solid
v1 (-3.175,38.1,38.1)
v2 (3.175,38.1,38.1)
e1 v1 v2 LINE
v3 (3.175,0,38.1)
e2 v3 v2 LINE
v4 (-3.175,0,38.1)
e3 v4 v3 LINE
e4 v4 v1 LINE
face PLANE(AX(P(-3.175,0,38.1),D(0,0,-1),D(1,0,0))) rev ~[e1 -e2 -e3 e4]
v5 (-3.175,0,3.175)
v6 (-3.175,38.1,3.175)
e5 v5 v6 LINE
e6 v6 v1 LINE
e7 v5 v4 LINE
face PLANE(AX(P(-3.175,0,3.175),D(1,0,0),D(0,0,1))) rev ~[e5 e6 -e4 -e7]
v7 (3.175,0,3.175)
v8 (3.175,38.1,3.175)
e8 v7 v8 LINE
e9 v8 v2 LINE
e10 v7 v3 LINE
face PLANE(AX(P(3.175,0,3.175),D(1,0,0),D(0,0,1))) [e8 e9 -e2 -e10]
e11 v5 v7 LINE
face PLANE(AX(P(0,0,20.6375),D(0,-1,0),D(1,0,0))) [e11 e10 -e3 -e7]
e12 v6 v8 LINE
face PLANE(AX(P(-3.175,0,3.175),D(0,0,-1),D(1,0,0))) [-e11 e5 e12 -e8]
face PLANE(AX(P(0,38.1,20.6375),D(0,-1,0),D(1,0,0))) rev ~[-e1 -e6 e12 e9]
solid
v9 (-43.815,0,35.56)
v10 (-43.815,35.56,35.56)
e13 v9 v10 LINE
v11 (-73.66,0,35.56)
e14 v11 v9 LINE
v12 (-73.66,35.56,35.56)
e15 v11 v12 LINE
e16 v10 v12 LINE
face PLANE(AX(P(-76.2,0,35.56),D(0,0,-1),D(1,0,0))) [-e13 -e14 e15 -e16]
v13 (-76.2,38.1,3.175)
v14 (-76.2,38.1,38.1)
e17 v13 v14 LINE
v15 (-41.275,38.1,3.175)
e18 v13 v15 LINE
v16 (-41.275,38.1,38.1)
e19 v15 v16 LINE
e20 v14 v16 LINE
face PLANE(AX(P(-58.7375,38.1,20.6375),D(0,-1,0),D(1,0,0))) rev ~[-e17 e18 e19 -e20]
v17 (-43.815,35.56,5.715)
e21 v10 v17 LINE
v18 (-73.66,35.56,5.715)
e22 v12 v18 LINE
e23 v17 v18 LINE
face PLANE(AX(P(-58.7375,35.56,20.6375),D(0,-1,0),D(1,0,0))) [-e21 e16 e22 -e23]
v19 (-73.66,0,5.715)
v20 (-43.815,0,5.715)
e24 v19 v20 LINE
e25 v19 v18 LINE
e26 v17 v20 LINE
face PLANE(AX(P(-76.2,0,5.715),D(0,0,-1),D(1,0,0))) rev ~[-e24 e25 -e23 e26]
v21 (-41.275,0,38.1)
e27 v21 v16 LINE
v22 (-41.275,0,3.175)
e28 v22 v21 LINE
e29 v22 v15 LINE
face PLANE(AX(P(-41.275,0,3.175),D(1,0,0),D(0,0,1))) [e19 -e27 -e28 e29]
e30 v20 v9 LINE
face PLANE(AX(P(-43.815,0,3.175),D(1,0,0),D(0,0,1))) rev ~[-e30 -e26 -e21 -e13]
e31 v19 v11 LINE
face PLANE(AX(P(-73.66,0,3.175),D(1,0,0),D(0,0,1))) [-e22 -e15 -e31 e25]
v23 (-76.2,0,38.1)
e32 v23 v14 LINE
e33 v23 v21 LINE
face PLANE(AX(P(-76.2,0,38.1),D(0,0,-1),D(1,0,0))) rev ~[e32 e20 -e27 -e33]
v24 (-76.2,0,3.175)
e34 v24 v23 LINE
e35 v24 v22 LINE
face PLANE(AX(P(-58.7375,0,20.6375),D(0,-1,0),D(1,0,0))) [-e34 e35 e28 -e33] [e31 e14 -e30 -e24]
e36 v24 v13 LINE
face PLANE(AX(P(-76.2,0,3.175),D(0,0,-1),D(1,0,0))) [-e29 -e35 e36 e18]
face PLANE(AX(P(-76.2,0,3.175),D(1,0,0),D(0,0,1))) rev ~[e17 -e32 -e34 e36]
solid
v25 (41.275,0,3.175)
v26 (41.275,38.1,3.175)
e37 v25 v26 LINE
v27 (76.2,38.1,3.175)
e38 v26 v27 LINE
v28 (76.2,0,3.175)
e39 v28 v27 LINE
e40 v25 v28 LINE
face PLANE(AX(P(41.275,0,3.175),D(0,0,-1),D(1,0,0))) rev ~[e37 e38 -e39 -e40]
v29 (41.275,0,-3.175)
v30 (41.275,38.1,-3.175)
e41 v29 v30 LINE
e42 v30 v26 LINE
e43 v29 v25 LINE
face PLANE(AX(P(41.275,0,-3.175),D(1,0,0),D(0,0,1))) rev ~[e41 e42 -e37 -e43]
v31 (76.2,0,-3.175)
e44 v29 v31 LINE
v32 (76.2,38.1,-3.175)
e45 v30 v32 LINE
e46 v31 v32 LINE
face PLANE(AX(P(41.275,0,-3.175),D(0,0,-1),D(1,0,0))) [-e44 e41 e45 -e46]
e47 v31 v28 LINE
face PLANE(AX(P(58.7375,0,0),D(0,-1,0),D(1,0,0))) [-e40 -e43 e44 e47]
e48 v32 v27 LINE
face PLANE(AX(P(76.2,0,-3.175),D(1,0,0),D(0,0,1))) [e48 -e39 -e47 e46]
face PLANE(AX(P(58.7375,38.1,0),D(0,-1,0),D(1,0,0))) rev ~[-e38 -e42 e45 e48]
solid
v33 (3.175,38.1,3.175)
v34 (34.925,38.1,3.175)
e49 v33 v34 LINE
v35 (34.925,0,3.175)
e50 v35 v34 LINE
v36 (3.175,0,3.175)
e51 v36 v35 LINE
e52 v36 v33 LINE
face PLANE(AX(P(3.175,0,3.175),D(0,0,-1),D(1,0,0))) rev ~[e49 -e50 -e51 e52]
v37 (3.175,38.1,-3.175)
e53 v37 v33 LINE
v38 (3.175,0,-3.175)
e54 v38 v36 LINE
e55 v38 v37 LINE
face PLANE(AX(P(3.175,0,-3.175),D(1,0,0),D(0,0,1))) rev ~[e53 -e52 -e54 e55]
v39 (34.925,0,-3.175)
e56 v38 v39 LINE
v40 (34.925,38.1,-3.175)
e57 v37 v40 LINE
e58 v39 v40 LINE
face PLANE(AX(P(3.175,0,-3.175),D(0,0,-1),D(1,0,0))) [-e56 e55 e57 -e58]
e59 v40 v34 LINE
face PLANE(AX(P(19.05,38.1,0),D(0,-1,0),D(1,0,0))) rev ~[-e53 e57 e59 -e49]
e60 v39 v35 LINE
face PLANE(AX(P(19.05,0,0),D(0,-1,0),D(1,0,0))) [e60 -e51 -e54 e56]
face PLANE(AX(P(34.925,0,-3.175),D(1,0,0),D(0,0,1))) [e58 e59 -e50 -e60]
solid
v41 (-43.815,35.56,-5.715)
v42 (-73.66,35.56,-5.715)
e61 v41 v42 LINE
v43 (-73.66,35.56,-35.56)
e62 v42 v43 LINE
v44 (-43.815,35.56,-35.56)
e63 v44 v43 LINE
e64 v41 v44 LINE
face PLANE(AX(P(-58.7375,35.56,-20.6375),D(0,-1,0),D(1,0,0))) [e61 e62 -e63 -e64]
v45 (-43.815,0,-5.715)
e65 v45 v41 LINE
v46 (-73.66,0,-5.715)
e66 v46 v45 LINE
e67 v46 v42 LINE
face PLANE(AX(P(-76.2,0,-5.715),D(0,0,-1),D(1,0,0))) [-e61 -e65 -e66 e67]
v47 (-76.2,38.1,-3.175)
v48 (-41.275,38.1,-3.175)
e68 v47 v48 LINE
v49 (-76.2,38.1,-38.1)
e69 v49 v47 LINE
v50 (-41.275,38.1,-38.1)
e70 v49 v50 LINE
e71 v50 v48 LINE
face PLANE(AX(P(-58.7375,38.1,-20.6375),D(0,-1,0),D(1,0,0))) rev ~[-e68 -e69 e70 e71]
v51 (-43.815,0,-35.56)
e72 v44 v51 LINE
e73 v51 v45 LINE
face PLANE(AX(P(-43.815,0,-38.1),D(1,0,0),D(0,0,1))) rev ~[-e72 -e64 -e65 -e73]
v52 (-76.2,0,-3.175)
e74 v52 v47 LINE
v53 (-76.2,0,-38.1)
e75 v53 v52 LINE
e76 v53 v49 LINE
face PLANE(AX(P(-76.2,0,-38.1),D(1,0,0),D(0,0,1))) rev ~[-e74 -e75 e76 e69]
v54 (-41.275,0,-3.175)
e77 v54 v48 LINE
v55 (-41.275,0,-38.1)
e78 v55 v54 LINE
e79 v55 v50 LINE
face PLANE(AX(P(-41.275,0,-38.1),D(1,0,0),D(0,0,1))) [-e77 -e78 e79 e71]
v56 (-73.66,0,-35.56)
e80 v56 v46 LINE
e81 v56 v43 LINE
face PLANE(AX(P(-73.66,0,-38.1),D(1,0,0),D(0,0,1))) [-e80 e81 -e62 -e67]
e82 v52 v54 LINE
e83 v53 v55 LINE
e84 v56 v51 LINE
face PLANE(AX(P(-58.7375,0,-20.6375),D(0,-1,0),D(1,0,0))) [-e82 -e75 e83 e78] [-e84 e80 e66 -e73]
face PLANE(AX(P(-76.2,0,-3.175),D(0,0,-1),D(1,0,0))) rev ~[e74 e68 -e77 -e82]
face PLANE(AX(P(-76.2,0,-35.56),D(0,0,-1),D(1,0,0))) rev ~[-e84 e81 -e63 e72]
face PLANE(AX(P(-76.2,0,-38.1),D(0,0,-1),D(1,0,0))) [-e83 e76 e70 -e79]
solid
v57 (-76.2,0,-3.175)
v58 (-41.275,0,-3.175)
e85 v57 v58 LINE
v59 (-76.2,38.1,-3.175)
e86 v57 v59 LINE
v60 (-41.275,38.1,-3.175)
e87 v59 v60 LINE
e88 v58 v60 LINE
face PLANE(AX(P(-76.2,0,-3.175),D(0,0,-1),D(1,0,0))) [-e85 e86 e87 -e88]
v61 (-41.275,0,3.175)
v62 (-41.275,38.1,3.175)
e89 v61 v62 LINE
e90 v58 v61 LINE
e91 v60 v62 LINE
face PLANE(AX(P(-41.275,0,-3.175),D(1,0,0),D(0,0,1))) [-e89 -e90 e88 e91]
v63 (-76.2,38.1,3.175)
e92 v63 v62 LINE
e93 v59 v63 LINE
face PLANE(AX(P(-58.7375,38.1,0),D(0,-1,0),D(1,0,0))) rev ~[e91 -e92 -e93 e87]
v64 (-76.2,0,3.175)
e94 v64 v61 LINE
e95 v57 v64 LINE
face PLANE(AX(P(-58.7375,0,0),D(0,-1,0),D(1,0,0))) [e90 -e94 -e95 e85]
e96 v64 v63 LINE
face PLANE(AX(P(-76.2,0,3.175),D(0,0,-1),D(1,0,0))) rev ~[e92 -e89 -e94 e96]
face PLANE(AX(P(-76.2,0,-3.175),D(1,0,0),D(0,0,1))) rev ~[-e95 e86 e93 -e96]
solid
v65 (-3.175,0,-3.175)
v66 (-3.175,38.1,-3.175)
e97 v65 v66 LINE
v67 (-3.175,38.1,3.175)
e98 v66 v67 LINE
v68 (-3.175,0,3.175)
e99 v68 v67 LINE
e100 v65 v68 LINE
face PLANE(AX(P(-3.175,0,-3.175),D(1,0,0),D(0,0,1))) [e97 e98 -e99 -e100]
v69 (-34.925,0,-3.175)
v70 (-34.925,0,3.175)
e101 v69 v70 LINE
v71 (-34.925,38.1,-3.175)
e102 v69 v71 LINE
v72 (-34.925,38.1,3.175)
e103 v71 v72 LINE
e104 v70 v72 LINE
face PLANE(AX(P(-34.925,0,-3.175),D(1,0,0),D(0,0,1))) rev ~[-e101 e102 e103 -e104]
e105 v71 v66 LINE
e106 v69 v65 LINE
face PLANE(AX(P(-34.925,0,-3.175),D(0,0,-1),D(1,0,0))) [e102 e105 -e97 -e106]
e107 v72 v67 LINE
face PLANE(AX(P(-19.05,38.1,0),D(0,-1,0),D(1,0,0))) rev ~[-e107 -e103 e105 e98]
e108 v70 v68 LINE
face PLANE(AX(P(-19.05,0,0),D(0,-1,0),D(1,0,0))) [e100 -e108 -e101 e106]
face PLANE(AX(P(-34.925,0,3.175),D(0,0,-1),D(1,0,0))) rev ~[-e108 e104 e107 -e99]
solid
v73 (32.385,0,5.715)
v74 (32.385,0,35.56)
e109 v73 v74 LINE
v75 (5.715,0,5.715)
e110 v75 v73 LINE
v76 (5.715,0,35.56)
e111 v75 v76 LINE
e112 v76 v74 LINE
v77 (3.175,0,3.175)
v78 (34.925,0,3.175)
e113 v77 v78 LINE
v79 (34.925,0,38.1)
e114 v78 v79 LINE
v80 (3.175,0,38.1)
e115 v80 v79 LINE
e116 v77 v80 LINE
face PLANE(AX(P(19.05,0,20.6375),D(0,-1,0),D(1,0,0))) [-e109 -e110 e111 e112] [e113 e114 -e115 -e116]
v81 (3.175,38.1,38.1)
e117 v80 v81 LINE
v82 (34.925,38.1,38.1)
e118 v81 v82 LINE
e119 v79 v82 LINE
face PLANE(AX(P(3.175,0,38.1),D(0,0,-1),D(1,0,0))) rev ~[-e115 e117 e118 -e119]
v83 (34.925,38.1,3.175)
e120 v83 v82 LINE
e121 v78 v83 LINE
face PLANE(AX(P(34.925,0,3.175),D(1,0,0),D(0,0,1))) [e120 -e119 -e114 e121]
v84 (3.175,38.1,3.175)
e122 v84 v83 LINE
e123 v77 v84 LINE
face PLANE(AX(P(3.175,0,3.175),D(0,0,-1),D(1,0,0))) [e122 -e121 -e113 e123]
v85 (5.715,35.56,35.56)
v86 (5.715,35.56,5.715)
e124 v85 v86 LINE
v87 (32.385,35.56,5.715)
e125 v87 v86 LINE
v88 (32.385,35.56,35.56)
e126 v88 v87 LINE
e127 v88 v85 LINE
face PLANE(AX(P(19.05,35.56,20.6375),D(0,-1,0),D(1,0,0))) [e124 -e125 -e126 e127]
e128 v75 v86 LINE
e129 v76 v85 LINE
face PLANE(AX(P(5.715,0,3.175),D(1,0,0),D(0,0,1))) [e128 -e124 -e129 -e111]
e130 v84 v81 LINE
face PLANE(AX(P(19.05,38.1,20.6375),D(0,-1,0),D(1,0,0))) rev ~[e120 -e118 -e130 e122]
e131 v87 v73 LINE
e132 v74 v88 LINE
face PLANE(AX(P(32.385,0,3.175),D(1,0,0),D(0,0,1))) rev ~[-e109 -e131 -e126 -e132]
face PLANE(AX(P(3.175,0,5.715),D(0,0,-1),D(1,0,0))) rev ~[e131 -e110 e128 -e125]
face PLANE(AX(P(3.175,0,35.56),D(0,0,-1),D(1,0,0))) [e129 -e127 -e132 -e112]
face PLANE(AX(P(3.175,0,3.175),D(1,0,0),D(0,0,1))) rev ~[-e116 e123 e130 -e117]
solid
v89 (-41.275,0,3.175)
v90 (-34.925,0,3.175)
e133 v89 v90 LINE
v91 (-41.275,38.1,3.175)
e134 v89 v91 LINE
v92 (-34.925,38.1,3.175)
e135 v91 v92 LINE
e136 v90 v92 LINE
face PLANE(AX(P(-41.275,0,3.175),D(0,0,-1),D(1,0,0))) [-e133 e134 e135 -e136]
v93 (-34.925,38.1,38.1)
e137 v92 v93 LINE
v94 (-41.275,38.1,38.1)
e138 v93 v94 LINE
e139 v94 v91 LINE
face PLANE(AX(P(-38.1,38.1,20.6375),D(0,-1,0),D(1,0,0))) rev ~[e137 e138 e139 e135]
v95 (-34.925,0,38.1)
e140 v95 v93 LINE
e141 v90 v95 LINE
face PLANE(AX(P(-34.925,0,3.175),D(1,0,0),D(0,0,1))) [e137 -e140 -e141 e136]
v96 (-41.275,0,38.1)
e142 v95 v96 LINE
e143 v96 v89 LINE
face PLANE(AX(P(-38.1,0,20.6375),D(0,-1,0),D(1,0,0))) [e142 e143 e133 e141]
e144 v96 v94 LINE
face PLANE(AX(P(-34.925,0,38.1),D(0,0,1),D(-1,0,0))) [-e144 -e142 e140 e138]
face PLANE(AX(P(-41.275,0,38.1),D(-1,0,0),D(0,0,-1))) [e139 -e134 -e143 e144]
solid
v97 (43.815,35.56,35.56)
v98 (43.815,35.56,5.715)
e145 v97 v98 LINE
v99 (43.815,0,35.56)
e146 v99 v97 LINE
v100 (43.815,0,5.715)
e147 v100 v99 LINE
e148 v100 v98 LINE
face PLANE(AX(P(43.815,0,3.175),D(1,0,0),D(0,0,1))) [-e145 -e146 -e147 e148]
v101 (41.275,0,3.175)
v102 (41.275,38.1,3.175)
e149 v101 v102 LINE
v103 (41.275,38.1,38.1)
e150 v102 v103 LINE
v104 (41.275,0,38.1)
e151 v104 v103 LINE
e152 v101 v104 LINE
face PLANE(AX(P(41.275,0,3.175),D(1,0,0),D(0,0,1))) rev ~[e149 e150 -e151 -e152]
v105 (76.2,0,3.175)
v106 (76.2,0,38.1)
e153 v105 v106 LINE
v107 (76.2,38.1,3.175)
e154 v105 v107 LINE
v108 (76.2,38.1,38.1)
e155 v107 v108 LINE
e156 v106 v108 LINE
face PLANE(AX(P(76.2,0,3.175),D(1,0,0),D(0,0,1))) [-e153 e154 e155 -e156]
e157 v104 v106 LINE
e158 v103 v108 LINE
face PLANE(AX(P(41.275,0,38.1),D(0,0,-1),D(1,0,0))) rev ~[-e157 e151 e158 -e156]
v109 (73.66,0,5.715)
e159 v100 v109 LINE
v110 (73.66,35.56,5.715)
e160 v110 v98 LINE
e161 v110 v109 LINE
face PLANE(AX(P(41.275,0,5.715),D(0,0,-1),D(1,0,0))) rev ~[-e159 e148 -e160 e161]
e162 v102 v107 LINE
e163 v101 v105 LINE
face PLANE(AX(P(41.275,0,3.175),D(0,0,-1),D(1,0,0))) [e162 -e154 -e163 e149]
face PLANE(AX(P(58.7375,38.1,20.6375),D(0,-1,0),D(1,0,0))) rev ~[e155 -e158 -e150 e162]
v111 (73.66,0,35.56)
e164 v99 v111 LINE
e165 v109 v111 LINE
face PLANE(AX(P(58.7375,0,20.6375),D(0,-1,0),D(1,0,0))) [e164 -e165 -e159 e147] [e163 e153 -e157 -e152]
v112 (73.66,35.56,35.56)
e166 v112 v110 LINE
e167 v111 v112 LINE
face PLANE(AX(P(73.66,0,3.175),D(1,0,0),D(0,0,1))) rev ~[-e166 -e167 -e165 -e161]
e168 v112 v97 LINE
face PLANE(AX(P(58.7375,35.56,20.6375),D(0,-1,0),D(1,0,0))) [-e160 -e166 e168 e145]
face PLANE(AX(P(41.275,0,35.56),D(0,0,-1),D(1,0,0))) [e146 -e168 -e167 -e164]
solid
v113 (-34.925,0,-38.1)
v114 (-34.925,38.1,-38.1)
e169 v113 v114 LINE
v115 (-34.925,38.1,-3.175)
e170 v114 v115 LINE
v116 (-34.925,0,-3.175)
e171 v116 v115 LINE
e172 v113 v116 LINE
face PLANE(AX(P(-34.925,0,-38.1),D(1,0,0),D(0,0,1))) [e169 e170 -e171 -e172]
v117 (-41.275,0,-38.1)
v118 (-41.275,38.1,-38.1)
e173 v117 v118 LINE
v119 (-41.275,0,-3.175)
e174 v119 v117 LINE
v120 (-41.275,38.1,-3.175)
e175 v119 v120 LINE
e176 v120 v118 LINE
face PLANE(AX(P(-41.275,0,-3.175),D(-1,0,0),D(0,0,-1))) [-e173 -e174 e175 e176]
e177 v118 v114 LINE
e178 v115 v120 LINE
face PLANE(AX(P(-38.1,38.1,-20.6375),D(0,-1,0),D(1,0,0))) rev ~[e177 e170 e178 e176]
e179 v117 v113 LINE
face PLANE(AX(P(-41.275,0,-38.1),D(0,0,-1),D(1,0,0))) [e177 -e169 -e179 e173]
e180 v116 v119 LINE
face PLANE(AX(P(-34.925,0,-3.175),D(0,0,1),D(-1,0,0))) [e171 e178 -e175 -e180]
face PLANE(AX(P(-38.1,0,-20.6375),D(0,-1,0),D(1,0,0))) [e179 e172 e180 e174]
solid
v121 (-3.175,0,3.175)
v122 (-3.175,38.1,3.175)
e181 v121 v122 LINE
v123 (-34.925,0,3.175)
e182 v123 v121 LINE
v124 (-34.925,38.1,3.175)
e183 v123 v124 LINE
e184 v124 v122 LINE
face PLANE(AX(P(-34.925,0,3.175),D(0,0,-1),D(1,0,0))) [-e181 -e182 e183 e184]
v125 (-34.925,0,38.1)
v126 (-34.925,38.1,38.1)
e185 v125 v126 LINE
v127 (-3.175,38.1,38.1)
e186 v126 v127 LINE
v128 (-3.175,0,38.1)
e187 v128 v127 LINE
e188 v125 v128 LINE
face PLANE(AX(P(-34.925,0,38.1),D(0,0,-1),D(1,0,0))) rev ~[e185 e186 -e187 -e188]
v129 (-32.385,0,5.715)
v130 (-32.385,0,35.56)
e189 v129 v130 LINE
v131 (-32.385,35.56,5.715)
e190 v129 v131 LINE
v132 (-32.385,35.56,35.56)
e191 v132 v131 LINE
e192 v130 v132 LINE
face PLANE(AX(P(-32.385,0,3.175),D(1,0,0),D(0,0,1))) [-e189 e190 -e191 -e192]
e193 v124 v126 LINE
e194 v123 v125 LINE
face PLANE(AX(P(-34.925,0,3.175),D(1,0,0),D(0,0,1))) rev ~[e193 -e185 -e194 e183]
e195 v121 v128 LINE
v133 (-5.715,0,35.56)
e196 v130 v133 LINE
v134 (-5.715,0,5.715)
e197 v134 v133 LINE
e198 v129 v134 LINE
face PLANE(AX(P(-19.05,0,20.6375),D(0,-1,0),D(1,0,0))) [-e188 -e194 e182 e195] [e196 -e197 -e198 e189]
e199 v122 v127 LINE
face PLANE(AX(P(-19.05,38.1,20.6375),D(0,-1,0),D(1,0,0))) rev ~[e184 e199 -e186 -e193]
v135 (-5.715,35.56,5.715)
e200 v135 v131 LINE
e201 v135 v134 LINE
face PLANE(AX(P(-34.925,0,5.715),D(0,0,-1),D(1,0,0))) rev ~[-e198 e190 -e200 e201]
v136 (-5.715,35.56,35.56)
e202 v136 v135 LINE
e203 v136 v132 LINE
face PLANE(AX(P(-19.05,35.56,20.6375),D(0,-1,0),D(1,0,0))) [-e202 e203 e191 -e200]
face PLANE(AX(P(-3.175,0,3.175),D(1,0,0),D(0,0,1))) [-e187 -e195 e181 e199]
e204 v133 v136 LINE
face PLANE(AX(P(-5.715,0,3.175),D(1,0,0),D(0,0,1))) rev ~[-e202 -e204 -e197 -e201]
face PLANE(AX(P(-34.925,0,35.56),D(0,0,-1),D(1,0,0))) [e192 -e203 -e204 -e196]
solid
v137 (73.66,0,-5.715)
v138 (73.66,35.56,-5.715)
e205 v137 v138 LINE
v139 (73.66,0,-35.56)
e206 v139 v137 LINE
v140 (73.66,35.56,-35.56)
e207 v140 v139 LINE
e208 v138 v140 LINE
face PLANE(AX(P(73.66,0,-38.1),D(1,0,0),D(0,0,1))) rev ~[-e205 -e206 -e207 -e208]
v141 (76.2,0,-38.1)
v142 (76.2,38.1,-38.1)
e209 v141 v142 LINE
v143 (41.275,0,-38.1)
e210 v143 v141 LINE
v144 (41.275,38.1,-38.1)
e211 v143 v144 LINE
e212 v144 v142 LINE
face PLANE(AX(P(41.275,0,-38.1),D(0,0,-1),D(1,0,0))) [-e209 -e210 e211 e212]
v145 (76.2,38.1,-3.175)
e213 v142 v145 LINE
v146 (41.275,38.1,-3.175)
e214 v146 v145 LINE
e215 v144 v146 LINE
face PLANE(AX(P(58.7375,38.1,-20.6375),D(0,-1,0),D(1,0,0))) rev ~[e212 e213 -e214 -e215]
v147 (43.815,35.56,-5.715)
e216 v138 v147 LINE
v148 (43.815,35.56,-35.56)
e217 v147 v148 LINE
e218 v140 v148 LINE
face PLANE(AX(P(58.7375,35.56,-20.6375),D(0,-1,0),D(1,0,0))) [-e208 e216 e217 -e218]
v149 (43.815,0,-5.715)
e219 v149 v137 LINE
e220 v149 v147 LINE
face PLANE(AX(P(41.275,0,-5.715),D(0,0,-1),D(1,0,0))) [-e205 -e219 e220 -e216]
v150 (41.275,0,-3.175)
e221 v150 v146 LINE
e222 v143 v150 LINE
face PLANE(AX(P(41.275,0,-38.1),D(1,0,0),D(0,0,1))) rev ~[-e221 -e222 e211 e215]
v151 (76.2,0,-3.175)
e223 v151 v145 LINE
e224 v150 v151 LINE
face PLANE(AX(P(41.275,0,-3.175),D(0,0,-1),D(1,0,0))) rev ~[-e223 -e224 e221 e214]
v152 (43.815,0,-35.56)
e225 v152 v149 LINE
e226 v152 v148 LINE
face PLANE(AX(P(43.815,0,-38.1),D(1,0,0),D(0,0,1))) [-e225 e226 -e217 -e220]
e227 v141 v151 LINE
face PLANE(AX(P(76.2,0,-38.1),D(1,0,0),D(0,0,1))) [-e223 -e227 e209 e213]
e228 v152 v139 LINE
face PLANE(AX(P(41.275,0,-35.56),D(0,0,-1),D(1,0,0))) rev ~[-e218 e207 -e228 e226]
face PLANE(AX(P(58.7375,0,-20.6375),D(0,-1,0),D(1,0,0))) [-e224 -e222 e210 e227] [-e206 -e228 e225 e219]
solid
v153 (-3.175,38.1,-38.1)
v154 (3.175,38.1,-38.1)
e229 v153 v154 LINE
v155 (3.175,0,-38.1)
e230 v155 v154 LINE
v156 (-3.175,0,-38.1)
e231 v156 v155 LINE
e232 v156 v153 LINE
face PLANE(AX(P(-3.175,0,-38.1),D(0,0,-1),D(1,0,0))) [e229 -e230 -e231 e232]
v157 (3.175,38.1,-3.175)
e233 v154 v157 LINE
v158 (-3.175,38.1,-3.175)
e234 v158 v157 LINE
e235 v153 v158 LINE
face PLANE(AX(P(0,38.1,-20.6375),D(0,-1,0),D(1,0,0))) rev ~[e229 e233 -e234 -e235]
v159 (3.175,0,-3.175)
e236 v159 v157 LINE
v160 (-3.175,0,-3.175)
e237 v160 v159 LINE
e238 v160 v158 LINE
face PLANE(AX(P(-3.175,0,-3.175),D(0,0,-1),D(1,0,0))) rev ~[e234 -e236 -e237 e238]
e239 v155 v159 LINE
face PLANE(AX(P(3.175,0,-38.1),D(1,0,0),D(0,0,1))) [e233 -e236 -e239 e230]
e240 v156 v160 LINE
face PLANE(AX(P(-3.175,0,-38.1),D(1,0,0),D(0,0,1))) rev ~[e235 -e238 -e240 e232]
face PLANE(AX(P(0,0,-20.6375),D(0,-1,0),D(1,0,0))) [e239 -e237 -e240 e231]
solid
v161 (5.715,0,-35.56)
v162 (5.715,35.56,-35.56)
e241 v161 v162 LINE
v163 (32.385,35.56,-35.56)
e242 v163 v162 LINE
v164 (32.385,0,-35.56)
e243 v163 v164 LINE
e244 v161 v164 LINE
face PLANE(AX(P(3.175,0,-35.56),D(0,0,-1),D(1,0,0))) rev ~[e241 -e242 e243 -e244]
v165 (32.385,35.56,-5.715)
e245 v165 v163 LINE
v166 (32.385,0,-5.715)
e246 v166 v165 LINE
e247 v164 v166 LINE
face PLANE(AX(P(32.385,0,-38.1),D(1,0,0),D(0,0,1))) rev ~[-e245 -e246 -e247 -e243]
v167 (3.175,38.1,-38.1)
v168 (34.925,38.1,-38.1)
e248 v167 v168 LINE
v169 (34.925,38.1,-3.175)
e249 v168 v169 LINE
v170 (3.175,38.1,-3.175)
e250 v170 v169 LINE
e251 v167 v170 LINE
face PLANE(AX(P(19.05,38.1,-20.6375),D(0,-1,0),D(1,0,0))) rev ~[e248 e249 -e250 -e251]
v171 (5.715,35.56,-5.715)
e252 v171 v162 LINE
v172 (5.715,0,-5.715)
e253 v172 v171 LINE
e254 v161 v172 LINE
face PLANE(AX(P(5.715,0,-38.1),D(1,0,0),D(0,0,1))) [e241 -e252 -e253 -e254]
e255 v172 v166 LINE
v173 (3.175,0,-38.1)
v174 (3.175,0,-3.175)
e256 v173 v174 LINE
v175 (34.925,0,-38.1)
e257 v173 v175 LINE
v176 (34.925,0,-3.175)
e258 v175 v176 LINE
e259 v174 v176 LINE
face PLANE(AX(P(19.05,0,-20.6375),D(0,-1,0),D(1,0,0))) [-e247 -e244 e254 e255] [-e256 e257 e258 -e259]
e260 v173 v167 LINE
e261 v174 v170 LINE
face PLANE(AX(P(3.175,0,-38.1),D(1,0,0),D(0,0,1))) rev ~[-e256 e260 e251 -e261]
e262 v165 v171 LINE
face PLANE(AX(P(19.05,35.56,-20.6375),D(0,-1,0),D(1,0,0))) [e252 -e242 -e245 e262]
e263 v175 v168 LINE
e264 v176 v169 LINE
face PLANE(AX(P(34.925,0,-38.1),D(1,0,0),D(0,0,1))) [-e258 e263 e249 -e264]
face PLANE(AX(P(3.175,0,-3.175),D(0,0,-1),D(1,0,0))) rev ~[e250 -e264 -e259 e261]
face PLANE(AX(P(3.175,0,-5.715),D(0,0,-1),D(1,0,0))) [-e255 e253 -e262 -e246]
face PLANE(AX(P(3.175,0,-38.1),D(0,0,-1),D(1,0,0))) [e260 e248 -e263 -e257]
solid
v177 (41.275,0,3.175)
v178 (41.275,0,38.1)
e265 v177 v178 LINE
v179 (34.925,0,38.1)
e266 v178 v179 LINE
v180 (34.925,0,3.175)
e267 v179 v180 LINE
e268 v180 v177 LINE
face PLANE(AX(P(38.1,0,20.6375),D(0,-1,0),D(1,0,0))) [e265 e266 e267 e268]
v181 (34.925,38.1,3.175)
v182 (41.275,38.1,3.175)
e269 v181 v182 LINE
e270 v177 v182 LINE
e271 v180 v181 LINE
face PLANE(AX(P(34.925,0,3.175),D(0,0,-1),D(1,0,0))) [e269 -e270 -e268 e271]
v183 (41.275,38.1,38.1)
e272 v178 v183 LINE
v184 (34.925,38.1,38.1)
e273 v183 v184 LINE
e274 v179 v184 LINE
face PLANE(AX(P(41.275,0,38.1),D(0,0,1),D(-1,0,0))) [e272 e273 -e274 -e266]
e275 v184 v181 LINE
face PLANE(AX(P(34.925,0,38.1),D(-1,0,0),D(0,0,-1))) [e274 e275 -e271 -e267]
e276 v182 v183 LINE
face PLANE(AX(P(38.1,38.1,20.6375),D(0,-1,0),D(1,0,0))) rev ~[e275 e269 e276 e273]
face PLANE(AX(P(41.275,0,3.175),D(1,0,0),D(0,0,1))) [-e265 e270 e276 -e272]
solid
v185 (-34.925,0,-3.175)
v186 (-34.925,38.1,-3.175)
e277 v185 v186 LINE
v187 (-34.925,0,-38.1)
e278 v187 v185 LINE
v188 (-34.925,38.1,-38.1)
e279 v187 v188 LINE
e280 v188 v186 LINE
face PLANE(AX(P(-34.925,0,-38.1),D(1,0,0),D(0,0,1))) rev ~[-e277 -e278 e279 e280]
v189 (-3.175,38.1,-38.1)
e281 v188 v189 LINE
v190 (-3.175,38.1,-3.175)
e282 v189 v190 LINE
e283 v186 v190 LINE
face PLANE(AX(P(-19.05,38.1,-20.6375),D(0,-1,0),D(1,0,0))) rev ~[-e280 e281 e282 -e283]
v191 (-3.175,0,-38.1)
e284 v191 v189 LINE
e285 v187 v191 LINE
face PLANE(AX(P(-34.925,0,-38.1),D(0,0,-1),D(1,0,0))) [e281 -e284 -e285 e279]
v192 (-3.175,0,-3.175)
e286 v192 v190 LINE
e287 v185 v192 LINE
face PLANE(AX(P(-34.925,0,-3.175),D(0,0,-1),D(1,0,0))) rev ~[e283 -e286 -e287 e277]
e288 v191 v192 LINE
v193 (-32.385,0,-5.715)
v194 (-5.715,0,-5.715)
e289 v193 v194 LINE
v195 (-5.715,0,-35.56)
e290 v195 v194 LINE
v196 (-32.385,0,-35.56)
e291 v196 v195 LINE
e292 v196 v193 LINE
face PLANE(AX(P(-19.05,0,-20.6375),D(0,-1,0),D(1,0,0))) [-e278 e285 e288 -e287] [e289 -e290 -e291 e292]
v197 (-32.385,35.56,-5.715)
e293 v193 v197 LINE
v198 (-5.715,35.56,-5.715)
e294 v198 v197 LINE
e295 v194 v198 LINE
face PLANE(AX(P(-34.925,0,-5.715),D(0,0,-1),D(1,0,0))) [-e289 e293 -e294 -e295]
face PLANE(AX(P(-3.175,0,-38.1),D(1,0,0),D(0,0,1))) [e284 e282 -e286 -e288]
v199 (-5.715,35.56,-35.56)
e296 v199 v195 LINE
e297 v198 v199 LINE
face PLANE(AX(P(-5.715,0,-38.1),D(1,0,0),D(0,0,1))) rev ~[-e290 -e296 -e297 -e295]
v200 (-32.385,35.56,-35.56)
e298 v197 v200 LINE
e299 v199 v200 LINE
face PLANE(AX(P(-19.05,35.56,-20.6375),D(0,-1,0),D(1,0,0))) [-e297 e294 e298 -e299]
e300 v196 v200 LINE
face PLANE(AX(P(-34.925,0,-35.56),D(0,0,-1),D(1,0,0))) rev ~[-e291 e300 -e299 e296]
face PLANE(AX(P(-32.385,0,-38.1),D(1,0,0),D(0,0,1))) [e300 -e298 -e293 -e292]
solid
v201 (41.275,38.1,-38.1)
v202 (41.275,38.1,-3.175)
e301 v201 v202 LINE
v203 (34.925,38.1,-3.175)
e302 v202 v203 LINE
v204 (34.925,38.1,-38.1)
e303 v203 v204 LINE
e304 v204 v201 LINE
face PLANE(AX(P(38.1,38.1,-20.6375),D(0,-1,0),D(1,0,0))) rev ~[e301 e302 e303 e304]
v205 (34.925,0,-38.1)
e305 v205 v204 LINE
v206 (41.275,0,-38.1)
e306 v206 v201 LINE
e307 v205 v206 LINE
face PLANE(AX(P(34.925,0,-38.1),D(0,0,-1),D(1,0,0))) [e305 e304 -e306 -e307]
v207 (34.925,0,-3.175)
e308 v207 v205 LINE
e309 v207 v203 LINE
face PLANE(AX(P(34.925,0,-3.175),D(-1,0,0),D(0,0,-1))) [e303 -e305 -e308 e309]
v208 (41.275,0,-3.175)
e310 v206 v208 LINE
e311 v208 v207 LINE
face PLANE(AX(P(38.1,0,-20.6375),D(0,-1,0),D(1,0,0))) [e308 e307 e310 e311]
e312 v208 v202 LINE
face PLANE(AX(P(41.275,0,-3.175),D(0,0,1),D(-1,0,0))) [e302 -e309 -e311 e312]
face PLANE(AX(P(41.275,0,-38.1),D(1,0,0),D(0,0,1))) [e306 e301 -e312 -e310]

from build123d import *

# Parameters (mm, degrees)
F0_W     = 34.925
F0_H     = 34.925
F1_DEPTH = 38.1
F0_W_2   = 31.75
F2_T     = -2.54
F2_2_T   = -2.54
F2_3_T   = -2.54
F2_4_T   = -2.54
F2_5_T   = -2.54
F2_6_T   = -2.54
F2_7_T   = -2.54
F2_8_T   = -2.54
F0_H_2   = 6.35
F3_DEPTH = 38.1
F0_W_3   = 6.35


with BuildPart() as f1:
    # F0 (on Front) → F1 (new body)
    with BuildSketch(Plane.XZ):
        with Locations((-58.7375, 20.6375)):
            Rectangle(F0_W, F0_H)
    extrude(amount=-F1_DEPTH)

    # F2
    f2_openings = [f1.faces().sort_by_distance(p)[0] for p in [
        (-58.7375, 0, 20.6375),
    ]]
    offset(amount=F2_T, openings=f2_openings)


with BuildPart() as f1b:
    # F0 (on Front) → F1, piece 2 (new body)
    with BuildSketch(Plane.XZ):
        with Locations((-19.05, 20.6375)):
            Rectangle(F0_W_2, F0_H)
    extrude(amount=-F1_DEPTH)

    # F2#2
    f2_2_openings = [f1b.faces().sort_by_distance(p)[0] for p in [
        (-19.05, 0, 20.6375),
    ]]
    offset(amount=F2_2_T, openings=f2_2_openings)


with BuildPart() as f1c:
    # F0 (on Front) → F1, piece 3 (new body)
    with BuildSketch(Plane.XZ):
        with Locations((19.05, 20.6375)):
            Rectangle(F0_W_2, F0_H)
    extrude(amount=-F1_DEPTH)

    # F2#3
    f2_3_openings = [f1c.faces().sort_by_distance(p)[0] for p in [
        (19.05, 0, 20.6375),
    ]]
    offset(amount=F2_3_T, openings=f2_3_openings)


with BuildPart() as f1d:
    # F0 (on Front) → F1, piece 4 (new body)
    with BuildSketch(Plane.XZ):
        with Locations((58.7375, 20.6375)):
            Rectangle(F0_W, F0_H)
    extrude(amount=-F1_DEPTH)

    # F2#4
    f2_4_openings = [f1d.faces().sort_by_distance(p)[0] for p in [
        (58.7375, 0, 20.6375),
    ]]
    offset(amount=F2_4_T, openings=f2_4_openings)


with BuildPart() as f1e:
    # F0 (on Front) → F1, piece 5 (new body)
    with BuildSketch(Plane.XZ):
        with Locations((58.7375, -20.6375)):
            Rectangle(F0_W, F0_H)
    extrude(amount=-F1_DEPTH)

    # F2#5
    f2_5_openings = [f1e.faces().sort_by_distance(p)[0] for p in [
        (58.7375, 0, -20.6375),
    ]]
    offset(amount=F2_5_T, openings=f2_5_openings)


with BuildPart() as f1f:
    # F0 (on Front) → F1, piece 6 (new body)
    with BuildSketch(Plane.XZ):
        with Locations((19.05, -20.6375)):
            Rectangle(F0_W_2, F0_H)
    extrude(amount=-F1_DEPTH)

    # F2#6
    f2_6_openings = [f1f.faces().sort_by_distance(p)[0] for p in [
        (19.05, 0, -20.6375),
    ]]
    offset(amount=F2_6_T, openings=f2_6_openings)


with BuildPart() as f1g:
    # F0 (on Front) → F1, piece 7 (new body)
    with BuildSketch(Plane.XZ):
        with Locations((-19.05, -20.6375)):
            Rectangle(F0_W_2, F0_H)
    extrude(amount=-F1_DEPTH)

    # F2#7
    f2_7_openings = [f1g.faces().sort_by_distance(p)[0] for p in [
        (-19.05, 0, -20.6375),
    ]]
    offset(amount=F2_7_T, openings=f2_7_openings)


with BuildPart() as f1h:
    # F0 (on Front) → F1, piece 8 (new body)
    with BuildSketch(Plane.XZ):
        with Locations((-58.7375, -20.6375)):
            Rectangle(F0_W, F0_H)
    extrude(amount=-F1_DEPTH)

    # F2#8
    f2_8_openings = [f1h.faces().sort_by_distance(p)[0] for p in [
        (-58.7375, 0, -20.6375),
    ]]
    offset(amount=F2_8_T, openings=f2_8_openings)


with BuildPart() as f3:
    # F0 (on Front) → F3 (new body)
    with BuildSketch(Plane.XZ):
        with Locations((-58.7375, 0)):
            Rectangle(F0_W, F0_H_2)
    extrude(amount=-F3_DEPTH)


with BuildPart() as f3b:
    # F0 (on Front) → F3, piece 2 (new body)
    with BuildSketch(Plane.XZ):
        Polygon((-34.925, 3.175), (-34.925, 38.1), (-38.1, 38.1), (-41.275, 38.1), (-41.275, 3.175), align=None)
    extrude(amount=-F3_DEPTH)


with BuildPart() as f3c:
    # F0 (on Front) → F3, piece 3 (new body)
    with BuildSketch(Plane.XZ):
        with Locations((-19.05, 0)):
            Rectangle(F0_W_2, F0_H_2)
    extrude(amount=-F3_DEPTH)


with BuildPart() as f3d:
    # F0 (on Front) → F3, piece 4 (new body)
    with BuildSketch(Plane.XZ):
        Polygon((-34.925, -38.1), (-34.925, -3.175), (-41.275, -3.175), (-41.275, -38.1), (-38.1, -38.1), align=None)
    extrude(amount=-F3_DEPTH)


with BuildPart() as f3e:
    # F0 (on Front) → F3, piece 5 (new body)
    with BuildSketch(Plane.XZ):
        with Locations((0, -20.6375)):
            Rectangle(F0_W_3, F0_H)
    extrude(amount=-F3_DEPTH)


with BuildPart() as f3f:
    # F0 (on Front) → F3, piece 6 (new body)
    with BuildSketch(Plane.XZ):
        with Locations((0, 20.6375)):
            Rectangle(F0_W_3, F0_H)
    extrude(amount=-F3_DEPTH)


with BuildPart() as f3g:
    # F0 (on Front) → F3, piece 7 (new body)
    with BuildSketch(Plane.XZ):
        Polygon((41.275, 3.175), (41.275, 38.1), (38.1, 38.1), (34.925, 38.1), (34.925, 3.175), align=None)
    extrude(amount=-F3_DEPTH)


with BuildPart() as f3h:
    # F0 (on Front) → F3, piece 8 (new body)
    with BuildSketch(Plane.XZ):
        Polygon((41.275, -38.1), (41.275, -3.175), (34.925, -3.175), (34.925, -38.1), (38.1, -38.1), align=None)
    extrude(amount=-F3_DEPTH)


with BuildPart() as f3i:
    # F0 (on Front) → F3, piece 9 (new body)
    with BuildSketch(Plane.XZ):
        with Locations((58.7375, 0)):
            Rectangle(F0_W, F0_H_2)
    extrude(amount=-F3_DEPTH)


with BuildPart() as f3j:
    # F0 (on Front) → F3, piece 10 (new body)
    with BuildSketch(Plane.XZ):
        with Locations((19.05, 0)):
            Rectangle(F0_W_2, F0_H_2)
    extrude(amount=-F3_DEPTH)


solid = Compound([f1.part, f1b.part, f1c.part, f1d.part, f1e.part, f1f.part, f1g.part, f1h.part, f3.part, f3b.part, f3c.part, f3d.part, f3e.part, f3f.part, f3g.part, f3h.part, f3i.part, f3j.part])
